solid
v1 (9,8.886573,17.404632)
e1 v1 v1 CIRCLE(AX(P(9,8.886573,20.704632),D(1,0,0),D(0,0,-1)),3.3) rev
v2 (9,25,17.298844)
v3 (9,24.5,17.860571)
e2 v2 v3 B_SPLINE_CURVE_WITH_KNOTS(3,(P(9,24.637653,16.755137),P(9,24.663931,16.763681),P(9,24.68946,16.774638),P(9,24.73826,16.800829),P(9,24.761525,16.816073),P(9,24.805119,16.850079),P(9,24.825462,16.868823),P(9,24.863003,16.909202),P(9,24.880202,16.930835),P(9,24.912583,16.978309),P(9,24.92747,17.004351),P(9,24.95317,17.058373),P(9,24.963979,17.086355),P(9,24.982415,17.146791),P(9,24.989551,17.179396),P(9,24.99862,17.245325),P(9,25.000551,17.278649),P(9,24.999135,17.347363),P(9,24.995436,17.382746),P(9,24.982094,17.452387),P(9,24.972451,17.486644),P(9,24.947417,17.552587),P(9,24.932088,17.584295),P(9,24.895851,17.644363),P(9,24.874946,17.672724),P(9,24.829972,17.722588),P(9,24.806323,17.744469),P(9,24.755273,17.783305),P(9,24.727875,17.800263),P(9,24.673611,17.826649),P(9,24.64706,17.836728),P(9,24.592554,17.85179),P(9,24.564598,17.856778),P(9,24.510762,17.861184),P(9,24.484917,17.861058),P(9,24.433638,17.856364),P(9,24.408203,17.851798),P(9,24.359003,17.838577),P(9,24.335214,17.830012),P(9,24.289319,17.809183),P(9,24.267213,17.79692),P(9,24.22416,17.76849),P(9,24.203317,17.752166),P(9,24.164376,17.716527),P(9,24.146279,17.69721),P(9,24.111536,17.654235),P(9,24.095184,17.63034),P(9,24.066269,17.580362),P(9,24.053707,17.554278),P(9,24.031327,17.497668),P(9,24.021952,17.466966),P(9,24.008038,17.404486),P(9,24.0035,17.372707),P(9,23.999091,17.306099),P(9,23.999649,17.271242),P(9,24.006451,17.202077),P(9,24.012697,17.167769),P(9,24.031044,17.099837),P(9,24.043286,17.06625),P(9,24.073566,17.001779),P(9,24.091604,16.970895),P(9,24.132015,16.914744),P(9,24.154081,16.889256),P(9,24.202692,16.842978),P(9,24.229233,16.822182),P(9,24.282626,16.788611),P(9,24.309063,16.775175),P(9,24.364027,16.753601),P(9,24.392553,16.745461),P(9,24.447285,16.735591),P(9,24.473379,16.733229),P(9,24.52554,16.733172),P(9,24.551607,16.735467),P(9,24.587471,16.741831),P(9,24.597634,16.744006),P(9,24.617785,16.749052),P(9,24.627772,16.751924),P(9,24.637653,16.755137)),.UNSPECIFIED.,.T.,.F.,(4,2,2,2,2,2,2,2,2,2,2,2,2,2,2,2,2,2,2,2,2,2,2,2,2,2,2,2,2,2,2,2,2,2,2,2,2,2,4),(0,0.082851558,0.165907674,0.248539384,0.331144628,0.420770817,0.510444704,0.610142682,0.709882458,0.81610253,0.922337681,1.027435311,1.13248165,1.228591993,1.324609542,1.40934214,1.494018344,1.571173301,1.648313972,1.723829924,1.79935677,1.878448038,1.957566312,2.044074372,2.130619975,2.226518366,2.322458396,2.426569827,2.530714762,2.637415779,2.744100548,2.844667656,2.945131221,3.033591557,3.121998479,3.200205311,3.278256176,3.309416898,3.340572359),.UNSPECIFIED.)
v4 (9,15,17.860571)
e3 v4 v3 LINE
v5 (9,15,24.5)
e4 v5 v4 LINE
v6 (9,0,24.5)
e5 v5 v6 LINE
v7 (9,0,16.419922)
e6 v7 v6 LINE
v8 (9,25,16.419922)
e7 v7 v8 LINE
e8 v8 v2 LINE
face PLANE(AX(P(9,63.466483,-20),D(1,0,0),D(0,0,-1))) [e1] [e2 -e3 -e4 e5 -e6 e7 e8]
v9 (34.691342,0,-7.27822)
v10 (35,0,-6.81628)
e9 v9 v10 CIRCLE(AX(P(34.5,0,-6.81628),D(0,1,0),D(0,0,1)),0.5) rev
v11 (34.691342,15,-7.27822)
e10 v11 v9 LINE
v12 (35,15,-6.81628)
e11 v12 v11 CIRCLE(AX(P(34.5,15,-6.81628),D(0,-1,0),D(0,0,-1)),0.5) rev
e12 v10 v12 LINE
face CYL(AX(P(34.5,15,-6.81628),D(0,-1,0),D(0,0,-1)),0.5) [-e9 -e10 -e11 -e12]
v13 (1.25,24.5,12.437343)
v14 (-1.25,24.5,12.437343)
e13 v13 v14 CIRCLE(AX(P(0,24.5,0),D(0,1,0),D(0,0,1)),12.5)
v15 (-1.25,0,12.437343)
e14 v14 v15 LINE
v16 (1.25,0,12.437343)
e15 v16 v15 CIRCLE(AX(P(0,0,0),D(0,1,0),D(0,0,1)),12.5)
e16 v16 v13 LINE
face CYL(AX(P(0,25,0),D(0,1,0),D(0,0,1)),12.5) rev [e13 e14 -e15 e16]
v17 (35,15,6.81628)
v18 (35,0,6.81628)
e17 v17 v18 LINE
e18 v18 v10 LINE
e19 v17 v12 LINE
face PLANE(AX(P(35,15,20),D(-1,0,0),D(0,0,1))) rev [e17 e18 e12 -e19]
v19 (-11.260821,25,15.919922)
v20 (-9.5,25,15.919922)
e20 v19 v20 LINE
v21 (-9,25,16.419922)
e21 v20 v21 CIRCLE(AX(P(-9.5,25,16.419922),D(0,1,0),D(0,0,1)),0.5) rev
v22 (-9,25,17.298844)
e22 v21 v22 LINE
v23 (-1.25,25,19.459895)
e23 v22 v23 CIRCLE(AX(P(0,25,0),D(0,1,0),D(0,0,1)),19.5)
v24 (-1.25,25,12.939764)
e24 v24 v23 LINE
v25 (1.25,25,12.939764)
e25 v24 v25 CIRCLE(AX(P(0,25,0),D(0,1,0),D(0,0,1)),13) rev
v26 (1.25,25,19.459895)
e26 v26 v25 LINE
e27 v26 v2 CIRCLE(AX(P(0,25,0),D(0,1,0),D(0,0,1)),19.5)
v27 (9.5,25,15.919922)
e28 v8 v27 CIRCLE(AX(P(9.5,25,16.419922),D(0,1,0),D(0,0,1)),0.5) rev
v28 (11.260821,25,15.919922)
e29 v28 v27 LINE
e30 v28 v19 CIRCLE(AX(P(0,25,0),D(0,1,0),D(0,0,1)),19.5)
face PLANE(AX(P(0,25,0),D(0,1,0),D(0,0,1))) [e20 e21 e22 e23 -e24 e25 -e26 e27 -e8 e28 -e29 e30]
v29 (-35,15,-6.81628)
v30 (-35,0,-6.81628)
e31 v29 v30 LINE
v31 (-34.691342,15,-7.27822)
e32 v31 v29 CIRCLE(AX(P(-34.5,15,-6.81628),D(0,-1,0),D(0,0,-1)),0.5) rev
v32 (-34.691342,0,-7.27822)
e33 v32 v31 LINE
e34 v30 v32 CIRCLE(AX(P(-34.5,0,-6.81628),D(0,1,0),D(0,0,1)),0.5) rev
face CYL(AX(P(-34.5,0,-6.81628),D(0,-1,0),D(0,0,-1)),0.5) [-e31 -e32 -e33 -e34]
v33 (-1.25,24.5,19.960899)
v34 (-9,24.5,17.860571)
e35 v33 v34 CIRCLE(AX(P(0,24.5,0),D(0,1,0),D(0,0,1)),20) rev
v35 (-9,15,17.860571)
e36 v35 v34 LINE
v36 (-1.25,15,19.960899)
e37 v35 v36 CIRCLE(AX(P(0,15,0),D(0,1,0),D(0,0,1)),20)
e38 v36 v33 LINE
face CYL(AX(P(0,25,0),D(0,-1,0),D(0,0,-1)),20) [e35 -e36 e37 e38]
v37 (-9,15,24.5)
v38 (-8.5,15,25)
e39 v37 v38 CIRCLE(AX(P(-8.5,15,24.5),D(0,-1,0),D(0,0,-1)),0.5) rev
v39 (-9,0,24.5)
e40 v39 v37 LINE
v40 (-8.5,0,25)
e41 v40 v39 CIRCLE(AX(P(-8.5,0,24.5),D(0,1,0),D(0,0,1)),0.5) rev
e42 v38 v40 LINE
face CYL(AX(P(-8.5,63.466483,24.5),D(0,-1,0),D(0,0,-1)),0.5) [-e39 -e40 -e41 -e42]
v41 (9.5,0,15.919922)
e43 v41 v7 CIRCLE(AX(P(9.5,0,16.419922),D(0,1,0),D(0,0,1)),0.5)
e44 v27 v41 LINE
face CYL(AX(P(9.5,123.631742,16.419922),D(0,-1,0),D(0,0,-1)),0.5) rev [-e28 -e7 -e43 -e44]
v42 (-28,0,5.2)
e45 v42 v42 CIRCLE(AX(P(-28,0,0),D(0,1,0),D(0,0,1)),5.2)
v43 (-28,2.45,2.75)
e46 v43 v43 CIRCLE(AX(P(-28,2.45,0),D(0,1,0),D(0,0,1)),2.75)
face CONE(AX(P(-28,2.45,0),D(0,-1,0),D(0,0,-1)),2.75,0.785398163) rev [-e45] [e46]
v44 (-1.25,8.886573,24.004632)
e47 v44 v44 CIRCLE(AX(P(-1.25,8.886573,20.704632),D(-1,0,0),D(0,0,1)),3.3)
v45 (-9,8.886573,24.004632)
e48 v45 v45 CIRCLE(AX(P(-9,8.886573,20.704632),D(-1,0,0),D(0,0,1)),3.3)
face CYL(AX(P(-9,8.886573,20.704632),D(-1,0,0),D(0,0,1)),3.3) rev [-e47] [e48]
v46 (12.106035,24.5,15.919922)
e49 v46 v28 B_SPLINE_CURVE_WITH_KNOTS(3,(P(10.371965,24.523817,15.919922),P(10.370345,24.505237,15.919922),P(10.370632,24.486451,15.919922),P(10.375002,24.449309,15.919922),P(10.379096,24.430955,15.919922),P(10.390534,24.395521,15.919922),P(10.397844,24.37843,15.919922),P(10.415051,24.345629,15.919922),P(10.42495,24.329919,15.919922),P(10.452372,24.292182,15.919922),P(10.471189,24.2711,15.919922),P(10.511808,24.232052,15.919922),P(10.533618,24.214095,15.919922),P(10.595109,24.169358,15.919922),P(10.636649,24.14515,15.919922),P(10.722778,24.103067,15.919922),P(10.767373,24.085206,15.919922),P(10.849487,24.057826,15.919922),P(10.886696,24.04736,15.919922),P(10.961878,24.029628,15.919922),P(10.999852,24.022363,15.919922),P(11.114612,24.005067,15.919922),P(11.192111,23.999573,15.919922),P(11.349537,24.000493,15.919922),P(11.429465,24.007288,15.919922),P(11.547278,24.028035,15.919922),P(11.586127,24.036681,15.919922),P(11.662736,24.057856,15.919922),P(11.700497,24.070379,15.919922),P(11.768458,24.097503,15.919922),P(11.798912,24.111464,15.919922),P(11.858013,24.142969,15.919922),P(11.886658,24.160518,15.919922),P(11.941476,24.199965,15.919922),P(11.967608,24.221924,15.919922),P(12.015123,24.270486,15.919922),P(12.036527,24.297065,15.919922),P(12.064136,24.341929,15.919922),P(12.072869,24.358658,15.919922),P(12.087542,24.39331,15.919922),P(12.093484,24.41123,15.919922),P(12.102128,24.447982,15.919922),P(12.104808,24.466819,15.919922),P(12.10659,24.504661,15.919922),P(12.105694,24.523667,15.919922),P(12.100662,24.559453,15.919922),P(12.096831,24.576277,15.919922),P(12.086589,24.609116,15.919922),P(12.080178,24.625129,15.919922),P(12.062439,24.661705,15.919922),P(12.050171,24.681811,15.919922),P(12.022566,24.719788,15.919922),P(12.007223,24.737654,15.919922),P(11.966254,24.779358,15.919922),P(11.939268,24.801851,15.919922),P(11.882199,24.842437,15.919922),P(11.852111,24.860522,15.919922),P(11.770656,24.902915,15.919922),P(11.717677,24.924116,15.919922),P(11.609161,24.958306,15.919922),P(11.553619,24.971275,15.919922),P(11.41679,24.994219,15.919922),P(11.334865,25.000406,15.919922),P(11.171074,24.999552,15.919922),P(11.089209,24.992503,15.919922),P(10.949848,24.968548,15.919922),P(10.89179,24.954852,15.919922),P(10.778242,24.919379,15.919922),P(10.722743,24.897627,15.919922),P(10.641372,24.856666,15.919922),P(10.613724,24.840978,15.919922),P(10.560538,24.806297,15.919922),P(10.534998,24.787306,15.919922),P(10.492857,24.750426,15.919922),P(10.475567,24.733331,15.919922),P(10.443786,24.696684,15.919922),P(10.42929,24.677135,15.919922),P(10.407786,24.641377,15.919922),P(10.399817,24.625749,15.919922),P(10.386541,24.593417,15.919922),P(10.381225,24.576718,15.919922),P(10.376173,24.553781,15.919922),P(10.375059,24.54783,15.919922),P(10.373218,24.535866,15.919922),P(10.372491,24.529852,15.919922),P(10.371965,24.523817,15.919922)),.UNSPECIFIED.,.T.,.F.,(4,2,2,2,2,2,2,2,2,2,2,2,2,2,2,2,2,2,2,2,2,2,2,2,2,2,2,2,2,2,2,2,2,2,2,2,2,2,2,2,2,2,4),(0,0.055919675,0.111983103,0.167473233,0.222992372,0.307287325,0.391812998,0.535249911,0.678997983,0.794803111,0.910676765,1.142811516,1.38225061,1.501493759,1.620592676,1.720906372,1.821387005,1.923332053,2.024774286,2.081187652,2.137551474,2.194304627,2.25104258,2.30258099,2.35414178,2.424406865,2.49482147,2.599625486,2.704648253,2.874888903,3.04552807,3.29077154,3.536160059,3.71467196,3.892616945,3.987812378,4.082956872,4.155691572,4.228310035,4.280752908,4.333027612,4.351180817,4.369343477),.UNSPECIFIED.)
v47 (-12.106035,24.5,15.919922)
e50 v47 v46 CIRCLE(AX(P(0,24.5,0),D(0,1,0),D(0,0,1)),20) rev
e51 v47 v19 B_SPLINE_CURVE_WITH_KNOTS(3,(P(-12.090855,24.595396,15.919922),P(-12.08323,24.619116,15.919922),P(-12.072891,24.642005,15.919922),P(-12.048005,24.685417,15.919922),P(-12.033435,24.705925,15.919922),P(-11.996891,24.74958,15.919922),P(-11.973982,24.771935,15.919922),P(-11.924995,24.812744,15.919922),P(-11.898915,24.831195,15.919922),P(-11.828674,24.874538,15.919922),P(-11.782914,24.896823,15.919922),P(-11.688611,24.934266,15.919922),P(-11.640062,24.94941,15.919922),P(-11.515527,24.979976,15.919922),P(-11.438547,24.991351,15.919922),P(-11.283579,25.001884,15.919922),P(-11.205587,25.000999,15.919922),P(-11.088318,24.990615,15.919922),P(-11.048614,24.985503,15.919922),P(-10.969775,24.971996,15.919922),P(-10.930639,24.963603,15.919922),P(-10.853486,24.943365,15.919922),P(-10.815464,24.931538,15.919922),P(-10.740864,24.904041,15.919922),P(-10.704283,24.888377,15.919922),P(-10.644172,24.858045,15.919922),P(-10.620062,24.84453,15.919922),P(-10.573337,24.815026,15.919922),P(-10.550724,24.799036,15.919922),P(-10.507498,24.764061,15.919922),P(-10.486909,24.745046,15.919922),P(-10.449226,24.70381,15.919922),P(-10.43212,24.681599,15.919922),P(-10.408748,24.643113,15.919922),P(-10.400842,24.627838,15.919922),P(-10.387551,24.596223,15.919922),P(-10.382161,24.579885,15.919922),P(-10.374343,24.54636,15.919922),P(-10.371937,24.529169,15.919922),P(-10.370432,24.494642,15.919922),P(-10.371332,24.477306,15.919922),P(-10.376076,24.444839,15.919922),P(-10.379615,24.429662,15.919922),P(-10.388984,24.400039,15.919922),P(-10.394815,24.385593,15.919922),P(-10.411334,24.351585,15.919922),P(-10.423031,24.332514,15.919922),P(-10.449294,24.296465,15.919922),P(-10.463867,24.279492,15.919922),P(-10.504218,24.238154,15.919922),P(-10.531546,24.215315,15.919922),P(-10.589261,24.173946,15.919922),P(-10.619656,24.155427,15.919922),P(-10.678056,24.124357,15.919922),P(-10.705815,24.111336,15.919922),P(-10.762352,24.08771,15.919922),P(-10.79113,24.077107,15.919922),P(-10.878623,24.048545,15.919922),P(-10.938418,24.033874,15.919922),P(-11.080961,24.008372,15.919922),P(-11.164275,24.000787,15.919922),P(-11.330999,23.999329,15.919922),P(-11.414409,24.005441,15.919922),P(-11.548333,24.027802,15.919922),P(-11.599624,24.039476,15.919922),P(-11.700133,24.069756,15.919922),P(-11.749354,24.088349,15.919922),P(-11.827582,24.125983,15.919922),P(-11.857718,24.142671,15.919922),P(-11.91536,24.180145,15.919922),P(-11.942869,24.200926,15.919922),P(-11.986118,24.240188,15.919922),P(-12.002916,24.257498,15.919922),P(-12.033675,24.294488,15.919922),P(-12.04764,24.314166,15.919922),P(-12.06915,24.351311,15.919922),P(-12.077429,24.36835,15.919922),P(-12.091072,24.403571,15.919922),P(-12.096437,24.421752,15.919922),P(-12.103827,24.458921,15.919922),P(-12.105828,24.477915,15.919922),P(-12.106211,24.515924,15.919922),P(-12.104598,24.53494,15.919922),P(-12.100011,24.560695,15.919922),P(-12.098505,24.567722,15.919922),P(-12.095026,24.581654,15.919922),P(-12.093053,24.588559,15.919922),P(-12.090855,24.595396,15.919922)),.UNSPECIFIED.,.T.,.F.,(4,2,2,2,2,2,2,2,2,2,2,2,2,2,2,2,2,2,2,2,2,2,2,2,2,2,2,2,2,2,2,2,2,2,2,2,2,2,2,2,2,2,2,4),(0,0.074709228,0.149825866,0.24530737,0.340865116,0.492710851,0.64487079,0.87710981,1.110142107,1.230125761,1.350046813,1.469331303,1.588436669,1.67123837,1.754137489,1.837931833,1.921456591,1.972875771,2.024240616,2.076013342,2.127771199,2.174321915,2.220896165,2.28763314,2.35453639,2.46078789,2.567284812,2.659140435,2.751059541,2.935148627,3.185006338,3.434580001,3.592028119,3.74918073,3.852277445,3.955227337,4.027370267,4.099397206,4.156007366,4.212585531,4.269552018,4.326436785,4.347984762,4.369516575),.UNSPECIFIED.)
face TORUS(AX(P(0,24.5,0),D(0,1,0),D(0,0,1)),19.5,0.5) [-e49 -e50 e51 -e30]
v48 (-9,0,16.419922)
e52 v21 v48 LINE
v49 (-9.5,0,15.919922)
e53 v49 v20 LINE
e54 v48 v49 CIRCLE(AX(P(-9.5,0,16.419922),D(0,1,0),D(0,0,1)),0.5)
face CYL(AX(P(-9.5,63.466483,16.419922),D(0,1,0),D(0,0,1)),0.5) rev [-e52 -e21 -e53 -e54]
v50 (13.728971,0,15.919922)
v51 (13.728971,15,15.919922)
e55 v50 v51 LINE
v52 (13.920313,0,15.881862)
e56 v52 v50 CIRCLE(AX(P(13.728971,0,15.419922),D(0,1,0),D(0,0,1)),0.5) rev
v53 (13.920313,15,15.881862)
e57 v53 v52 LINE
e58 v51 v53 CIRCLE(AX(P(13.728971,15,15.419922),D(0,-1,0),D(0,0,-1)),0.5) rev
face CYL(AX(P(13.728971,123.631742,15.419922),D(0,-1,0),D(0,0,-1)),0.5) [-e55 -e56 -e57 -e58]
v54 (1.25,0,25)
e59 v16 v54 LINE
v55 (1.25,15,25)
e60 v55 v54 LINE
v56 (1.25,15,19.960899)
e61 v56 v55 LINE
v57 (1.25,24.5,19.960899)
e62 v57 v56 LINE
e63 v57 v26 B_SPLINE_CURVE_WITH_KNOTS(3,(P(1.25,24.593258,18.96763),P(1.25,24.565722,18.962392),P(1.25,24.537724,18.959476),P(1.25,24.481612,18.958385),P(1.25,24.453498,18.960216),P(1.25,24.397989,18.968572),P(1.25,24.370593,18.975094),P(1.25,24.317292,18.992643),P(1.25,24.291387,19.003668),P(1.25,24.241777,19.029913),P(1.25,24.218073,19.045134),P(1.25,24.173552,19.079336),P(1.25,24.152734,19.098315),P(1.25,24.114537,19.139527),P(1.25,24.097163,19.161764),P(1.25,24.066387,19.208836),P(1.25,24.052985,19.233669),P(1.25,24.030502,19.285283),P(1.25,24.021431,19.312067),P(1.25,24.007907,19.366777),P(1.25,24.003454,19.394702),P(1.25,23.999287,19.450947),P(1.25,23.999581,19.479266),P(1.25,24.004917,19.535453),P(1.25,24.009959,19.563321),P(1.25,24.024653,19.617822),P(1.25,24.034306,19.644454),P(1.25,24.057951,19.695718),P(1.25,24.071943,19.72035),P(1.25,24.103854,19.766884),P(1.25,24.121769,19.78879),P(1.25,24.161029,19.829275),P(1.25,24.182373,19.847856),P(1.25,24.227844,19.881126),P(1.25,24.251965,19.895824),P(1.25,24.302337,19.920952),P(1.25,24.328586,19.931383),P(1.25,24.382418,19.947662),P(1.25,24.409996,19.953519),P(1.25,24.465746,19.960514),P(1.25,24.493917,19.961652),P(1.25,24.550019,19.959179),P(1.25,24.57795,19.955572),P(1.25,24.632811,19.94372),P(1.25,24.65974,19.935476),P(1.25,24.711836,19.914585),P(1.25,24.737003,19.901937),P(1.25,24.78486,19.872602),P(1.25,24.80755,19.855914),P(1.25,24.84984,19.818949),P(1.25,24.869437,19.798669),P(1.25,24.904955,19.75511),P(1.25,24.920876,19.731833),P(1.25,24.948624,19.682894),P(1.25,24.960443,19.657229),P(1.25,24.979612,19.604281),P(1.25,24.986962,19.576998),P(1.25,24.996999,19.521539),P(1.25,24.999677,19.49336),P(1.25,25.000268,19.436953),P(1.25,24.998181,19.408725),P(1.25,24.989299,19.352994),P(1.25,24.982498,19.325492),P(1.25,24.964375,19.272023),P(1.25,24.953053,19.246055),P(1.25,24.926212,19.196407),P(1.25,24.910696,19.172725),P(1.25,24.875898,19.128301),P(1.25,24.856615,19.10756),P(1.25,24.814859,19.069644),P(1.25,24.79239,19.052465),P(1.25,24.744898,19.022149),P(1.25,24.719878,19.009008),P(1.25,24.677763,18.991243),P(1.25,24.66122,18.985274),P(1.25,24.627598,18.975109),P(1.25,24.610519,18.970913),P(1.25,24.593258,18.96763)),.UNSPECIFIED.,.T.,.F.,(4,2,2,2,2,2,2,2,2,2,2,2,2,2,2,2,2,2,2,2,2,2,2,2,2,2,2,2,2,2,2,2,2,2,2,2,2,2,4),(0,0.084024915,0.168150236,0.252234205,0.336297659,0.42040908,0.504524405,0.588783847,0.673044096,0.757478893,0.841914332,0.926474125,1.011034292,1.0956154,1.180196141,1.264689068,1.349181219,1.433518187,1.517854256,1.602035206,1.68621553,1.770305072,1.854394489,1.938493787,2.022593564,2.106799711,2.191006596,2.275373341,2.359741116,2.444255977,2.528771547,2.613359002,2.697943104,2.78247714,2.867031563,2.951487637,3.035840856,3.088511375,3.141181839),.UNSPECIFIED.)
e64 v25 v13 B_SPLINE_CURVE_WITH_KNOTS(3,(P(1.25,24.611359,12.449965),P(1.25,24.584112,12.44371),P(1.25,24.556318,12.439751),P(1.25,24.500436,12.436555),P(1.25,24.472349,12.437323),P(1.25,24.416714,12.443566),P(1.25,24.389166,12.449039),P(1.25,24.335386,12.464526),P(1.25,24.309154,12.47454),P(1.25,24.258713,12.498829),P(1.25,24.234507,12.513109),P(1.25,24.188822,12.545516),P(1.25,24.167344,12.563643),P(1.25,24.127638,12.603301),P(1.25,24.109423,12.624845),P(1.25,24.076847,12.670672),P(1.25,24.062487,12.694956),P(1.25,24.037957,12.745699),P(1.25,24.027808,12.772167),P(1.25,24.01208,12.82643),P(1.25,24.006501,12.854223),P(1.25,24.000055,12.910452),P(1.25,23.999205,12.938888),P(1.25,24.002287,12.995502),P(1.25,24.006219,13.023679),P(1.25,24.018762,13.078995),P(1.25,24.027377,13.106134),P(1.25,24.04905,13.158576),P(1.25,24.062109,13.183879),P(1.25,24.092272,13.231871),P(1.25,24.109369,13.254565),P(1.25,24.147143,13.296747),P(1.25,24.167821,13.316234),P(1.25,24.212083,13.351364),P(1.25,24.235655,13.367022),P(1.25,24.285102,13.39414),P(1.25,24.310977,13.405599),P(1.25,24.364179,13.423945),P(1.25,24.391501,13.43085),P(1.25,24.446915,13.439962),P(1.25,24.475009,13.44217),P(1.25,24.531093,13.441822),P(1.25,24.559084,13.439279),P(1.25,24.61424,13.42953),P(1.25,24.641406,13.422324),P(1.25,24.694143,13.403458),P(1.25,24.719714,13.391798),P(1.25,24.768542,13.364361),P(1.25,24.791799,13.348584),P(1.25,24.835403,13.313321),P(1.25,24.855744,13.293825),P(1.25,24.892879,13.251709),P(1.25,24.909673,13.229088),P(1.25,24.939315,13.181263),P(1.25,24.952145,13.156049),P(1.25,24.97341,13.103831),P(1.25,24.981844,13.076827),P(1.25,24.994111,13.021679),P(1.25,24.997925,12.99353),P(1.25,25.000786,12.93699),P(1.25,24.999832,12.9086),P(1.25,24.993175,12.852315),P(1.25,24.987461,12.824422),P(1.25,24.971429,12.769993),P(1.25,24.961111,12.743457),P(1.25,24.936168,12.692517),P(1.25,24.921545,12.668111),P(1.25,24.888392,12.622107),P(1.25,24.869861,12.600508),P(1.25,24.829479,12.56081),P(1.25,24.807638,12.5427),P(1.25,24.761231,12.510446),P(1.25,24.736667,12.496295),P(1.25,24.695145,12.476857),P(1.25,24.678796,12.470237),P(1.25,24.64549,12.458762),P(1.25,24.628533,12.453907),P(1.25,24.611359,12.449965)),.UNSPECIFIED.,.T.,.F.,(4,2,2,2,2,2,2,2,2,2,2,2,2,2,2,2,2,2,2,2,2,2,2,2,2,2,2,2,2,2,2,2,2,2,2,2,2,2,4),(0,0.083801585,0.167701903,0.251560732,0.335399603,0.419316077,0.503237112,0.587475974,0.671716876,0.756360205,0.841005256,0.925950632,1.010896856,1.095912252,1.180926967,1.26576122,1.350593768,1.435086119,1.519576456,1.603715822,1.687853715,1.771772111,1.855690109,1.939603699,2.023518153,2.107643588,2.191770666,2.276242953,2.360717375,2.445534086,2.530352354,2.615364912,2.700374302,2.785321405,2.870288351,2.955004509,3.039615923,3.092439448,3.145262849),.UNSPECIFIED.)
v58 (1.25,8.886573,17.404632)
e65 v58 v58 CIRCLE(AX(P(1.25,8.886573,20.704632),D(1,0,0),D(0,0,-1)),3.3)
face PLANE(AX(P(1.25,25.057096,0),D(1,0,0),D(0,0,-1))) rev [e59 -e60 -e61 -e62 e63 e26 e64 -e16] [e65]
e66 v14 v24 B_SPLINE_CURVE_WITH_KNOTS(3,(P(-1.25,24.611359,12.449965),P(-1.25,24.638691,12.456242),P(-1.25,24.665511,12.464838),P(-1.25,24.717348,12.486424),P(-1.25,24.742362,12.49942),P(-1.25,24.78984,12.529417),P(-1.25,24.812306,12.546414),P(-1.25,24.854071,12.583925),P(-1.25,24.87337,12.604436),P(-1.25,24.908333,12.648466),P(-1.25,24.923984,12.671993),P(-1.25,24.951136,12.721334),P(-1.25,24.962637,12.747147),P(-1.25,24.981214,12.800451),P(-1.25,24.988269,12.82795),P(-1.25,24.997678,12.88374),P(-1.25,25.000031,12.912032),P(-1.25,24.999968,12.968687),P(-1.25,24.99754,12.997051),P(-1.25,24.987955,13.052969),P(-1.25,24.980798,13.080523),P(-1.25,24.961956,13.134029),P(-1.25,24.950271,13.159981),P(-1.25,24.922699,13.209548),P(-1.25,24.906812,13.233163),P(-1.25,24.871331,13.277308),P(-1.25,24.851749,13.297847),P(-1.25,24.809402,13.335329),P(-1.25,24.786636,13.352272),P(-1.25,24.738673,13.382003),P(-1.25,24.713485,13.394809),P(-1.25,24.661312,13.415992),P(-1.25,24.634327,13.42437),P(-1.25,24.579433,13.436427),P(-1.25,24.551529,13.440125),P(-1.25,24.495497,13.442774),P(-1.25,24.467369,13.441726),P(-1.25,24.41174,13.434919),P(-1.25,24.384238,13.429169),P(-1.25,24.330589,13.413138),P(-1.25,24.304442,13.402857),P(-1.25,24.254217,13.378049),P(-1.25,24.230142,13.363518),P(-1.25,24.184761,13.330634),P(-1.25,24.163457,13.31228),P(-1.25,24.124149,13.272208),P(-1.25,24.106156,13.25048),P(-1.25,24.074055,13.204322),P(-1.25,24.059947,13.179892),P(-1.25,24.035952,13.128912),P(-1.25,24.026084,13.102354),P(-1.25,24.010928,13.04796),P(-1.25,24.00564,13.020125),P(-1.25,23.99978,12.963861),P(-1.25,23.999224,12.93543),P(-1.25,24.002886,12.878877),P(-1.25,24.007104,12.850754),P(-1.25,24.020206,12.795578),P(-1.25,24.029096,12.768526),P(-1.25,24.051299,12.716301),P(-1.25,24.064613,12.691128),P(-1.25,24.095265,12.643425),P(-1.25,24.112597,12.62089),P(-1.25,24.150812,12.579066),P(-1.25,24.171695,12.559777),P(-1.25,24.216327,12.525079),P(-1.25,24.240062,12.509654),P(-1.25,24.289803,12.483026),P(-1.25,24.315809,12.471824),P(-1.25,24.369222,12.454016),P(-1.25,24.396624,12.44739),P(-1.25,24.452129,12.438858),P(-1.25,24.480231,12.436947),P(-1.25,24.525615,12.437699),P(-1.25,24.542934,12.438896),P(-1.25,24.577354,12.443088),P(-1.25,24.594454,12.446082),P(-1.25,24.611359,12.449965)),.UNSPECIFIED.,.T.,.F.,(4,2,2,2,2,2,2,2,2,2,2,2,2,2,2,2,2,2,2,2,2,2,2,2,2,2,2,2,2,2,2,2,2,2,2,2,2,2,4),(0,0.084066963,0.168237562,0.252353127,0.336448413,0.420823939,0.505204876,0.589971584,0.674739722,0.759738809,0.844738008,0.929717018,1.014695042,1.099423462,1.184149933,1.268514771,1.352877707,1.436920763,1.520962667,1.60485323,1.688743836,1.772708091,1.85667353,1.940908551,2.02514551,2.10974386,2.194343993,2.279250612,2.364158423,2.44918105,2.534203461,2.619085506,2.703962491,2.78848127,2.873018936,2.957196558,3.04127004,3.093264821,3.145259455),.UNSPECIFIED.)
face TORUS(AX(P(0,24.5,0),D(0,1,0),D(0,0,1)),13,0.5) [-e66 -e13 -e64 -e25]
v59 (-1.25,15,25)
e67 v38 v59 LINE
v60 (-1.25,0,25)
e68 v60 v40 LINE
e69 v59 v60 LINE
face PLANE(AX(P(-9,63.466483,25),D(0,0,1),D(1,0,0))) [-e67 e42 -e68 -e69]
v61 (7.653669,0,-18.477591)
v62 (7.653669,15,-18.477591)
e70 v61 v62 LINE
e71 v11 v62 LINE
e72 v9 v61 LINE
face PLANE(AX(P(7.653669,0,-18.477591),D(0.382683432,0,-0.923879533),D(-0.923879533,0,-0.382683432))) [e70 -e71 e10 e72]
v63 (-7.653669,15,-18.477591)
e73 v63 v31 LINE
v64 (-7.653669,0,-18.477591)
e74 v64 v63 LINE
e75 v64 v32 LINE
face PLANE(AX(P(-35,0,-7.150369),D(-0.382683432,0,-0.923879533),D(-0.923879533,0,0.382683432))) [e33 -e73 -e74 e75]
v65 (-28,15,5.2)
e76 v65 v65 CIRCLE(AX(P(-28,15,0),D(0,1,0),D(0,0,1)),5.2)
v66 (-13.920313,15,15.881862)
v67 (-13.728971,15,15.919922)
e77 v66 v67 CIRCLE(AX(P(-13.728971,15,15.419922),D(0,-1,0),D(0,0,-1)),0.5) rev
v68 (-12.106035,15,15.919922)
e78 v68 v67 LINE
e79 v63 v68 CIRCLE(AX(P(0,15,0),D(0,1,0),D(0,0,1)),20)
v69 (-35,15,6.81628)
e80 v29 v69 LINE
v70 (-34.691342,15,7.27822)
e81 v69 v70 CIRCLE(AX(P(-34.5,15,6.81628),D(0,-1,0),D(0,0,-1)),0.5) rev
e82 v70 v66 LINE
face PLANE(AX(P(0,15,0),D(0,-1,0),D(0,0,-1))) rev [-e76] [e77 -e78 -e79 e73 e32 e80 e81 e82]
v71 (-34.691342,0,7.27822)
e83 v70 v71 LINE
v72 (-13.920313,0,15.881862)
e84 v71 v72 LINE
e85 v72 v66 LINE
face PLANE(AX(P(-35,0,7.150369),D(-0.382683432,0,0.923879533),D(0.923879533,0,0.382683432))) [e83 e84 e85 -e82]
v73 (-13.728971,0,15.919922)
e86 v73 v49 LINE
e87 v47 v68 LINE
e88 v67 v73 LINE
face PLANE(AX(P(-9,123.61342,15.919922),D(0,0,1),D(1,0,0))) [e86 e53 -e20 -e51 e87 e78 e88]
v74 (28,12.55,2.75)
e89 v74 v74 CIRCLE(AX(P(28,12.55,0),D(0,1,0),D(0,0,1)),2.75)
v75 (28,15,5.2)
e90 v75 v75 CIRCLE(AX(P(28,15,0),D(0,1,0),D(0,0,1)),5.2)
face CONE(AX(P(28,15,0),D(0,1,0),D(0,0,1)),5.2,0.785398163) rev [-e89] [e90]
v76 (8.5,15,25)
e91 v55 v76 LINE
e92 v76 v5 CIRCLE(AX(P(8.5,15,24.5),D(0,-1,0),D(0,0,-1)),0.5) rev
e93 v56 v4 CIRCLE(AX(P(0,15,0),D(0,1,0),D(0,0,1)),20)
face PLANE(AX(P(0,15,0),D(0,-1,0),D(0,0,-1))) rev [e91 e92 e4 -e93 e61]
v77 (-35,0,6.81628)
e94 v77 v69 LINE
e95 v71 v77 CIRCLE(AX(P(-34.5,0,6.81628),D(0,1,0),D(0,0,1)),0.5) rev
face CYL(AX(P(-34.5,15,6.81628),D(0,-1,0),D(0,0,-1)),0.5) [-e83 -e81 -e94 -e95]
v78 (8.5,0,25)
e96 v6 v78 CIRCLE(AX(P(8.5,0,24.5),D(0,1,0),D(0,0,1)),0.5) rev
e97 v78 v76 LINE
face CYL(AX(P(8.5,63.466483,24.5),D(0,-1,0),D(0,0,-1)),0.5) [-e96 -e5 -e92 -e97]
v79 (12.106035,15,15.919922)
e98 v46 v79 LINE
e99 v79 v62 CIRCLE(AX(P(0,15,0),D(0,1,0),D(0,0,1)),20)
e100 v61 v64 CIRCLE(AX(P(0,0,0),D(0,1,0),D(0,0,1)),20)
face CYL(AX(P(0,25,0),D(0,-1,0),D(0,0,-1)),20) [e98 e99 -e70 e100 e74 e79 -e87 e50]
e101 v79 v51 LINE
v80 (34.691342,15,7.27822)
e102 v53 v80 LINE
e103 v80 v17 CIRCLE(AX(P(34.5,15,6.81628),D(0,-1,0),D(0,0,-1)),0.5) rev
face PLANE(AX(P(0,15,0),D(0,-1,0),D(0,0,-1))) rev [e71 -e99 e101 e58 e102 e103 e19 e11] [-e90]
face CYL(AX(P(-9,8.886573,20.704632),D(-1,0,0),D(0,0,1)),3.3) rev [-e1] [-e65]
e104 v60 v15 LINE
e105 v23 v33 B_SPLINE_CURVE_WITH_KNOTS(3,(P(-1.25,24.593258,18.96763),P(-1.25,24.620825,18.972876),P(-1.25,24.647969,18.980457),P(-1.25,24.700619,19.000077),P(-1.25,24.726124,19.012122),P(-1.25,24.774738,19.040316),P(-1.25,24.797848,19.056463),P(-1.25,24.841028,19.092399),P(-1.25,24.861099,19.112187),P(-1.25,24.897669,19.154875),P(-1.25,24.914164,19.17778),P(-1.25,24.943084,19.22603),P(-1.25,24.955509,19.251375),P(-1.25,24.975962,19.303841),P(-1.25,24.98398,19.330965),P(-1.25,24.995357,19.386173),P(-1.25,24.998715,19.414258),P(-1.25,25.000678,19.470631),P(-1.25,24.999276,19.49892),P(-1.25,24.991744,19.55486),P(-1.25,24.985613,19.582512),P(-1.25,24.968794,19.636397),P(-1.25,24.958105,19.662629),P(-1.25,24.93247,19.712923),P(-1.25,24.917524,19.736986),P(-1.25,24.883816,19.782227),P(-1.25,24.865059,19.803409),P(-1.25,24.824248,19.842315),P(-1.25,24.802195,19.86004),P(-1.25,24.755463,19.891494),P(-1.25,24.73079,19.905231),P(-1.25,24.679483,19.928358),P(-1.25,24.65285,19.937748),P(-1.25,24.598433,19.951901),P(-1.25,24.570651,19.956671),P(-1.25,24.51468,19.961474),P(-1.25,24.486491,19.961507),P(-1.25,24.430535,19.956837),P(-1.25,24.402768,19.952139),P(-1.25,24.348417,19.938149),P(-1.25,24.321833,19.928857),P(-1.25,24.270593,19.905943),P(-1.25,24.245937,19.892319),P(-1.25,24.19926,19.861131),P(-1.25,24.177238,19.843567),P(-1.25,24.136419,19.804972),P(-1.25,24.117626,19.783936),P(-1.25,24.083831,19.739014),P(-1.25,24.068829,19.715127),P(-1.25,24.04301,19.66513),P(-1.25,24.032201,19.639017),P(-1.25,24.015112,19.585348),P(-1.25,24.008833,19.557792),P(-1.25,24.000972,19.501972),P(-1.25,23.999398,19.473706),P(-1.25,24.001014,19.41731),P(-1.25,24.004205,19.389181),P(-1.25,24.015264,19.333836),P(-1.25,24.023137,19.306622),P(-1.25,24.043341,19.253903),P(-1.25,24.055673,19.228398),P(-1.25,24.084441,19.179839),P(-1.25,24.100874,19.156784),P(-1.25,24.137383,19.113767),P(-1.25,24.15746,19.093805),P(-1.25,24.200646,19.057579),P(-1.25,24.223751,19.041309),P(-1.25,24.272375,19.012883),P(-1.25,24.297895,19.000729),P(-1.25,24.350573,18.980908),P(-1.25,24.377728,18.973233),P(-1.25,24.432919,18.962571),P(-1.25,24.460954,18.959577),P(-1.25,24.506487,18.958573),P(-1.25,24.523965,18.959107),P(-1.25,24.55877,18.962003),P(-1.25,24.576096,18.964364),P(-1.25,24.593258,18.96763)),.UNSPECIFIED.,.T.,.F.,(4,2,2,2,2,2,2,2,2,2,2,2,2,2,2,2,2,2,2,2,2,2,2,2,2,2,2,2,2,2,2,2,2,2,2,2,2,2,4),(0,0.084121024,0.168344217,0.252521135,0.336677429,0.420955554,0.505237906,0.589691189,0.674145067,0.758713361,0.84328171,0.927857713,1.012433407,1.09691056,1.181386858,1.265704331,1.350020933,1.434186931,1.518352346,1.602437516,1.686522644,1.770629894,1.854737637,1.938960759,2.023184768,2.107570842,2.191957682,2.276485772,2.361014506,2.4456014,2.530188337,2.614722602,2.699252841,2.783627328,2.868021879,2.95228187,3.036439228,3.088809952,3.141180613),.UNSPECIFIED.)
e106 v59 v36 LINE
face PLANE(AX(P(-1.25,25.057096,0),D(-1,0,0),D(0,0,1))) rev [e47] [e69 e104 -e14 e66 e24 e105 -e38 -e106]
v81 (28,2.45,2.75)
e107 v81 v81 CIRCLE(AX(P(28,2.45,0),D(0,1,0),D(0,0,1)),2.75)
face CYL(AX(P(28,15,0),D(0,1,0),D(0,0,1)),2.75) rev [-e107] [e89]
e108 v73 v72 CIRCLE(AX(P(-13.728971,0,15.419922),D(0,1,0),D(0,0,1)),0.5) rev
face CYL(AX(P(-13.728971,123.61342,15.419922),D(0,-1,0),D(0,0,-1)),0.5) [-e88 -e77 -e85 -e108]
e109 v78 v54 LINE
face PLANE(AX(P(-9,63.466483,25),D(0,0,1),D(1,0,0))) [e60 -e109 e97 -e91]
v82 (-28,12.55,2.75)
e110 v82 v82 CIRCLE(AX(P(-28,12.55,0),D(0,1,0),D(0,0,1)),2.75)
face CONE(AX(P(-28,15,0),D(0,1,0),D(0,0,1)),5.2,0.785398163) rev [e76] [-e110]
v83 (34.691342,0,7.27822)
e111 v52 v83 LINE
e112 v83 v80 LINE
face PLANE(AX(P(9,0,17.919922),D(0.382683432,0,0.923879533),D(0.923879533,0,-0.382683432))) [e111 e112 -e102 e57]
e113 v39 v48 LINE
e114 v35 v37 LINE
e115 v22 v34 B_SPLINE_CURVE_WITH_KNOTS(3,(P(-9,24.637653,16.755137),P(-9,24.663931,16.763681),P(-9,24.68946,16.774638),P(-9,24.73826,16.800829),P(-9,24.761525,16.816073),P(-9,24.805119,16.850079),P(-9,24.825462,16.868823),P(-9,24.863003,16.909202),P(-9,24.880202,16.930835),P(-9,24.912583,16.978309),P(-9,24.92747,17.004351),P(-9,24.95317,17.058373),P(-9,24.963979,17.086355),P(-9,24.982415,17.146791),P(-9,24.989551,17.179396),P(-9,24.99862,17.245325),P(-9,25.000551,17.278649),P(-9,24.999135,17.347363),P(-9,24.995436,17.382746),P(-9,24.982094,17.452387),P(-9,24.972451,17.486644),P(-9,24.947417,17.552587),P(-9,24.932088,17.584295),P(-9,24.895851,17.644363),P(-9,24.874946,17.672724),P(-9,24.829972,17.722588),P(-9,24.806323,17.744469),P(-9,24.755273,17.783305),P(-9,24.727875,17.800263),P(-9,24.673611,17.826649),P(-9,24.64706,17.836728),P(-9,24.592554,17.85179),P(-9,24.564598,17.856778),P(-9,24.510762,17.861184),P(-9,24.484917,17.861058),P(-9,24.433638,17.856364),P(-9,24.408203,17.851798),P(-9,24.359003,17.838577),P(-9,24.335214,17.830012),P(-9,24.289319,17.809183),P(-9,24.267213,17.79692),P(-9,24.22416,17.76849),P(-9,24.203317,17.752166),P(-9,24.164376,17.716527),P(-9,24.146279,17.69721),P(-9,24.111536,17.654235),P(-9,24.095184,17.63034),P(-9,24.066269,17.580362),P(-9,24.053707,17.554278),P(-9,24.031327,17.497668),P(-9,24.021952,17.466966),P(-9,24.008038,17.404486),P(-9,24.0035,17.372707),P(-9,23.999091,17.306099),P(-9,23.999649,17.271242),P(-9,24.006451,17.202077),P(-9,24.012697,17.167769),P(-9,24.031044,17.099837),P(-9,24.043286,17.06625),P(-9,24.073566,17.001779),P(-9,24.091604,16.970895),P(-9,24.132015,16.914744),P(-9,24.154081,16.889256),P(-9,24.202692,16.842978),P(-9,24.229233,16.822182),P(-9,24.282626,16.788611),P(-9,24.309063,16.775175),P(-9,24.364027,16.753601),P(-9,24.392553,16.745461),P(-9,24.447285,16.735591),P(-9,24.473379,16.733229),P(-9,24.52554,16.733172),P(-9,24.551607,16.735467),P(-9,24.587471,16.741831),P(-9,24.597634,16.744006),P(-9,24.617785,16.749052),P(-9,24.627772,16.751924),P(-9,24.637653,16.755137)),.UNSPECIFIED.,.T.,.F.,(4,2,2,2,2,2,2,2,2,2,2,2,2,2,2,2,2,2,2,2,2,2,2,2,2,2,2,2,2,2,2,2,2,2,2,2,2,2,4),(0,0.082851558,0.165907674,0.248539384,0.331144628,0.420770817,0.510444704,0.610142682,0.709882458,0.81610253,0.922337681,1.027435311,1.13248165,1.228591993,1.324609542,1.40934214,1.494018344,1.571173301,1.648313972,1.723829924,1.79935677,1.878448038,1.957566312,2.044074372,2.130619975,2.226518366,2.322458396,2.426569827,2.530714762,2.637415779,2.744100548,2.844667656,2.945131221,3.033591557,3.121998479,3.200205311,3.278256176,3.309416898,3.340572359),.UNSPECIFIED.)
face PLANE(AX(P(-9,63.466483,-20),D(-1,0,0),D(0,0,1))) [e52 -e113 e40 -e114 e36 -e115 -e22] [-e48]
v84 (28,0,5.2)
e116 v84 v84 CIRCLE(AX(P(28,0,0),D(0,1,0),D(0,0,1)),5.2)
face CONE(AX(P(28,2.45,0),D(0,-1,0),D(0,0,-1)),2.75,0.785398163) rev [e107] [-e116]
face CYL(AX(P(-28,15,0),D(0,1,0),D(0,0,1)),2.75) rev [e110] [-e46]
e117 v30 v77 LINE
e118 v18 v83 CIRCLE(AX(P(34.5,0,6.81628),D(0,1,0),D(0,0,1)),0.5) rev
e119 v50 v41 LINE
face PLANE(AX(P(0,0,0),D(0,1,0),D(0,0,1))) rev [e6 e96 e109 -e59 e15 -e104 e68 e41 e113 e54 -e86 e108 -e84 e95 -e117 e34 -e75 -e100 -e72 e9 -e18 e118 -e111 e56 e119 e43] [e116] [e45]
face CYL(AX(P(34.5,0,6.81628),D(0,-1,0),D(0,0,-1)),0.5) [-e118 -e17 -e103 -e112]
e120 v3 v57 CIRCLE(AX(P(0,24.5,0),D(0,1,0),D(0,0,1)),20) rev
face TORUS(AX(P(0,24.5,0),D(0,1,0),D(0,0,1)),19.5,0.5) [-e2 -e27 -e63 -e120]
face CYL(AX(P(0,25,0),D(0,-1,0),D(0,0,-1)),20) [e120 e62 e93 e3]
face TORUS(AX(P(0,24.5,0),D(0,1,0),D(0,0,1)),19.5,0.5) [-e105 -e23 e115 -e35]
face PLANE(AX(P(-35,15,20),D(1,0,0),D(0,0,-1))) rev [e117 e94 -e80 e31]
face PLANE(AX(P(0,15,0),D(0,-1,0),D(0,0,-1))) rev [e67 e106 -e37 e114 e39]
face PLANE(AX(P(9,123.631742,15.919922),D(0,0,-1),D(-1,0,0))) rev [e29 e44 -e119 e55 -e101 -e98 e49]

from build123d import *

# Parameters (mm, degrees)
SKETCH1_W                                    = 70
SKETCH1_H                                    = 40
EXTRUDE1_DEPTH                               = 15
SKETCH3_R                                    = 20
EXTRUDE2_DEPTH                               = 10
SKETCH21_W                                   = 18
SKETCH21_H                                   = 45
EXTRUDE7_DEPTH                               = 15
F_25_0_MM_DOWEL_HOLES1_DEPTH                 = 15
F_25_0_MM_DOWEL_HOLES1_2_OUTLINE_R           = 12.5
F_25_0_MM_DOWEL_HOLES1_2_DEPTH               = 25
CSK_FOR_M5_COUNTERSUNK_FLAT_HEAD_SCR_2_COUNT = 2
CSK_FOR_M5_COUNTERSUNK_FLAT_HEAD_SCR_2_PITCH = 56
EXTRUDE8_START                               = -15
EXTRUDE8_DEPTH                               = 15
FILLET10_R                                   = 0.5
EXTRUDE9_DEPTH                               = 46.552167896
SKETCH23_W                                   = 2.5
SKETCH23_H                                   = 25
EXTRUDE10_DEPTH                              = 50.749371906
FILLET11_R                                   = 0.5
M6_CLEARANCE_HOLE1_D                         = 6.6


with BuildPart() as part:
    # Sketch1 → Extrude1 (new body)
    with BuildSketch(Plane(origin=(0, 0, 0), x_dir=(1, 0, 0), z_dir=(0, 1, 0))):
        Rectangle(SKETCH1_W, SKETCH1_H)
    extrude(amount=EXTRUDE1_DEPTH)

    # Sketch3 → Extrude2 (add)
    with BuildSketch(Plane(origin=(0, 15, 0), x_dir=(1, 0, 0), z_dir=(0, 1, 0))):
        with Locations(Location((0, 0, 0), (0, 0, 270))):
            Circle(SKETCH3_R)
    extrude(amount=EXTRUDE2_DEPTH)

    # 25.0 mm Dowel Holes1 2 outline → 25.0 mm Dowel Holes1 2 (cut)
    with BuildSketch(Plane(origin=(0, 0, 0), x_dir=(1, 0, 0), z_dir=(0, 1, 0))):
        Circle(F_25_0_MM_DOWEL_HOLES1_2_OUTLINE_R)
    extrude(amount=F_25_0_MM_DOWEL_HOLES1_2_DEPTH, mode=Mode.SUBTRACT)

    # Sketch11 → CSK for M5 Countersunk Flat Head Screw1 (revolve, cut)
    with BuildSketch(Plane(origin=(-28, 15, 0), x_dir=(0, 0, 1), z_dir=(1, 0, 0))):
        Polygon((0, 0), (0, 15), (5.2, 15), (2.75, 12.55), (2.75, 2.45), (5.2, 0), align=None)
    csk_for_m5_countersunk_flat_head_screw1 = revolve(axis=Axis((-28, 21.35, 0), (0, -1, 0)), mode=Mode.SUBTRACT)

    # CSK for M5 Countersunk Flat Head Scr 2: CSK for M5 Countersunk Flat Head Screw1 ×2
    with Locations(*[(i * CSK_FOR_M5_COUNTERSUNK_FLAT_HEAD_SCR_2_PITCH, 0, 0) for i in range(1, CSK_FOR_M5_COUNTERSUNK_FLAT_HEAD_SCR_2_COUNT)]):
        add(csk_for_m5_countersunk_flat_head_screw1, mode=Mode.SUBTRACT)


with BuildPart() as body_2:
    # Sketch21 → Extrude7 (new body)
    with BuildSketch(Plane.XZ):
        with Locations((0, 2.5)):
            Rectangle(SKETCH21_W, SKETCH21_H)
    extrude(amount=-EXTRUDE7_DEPTH)

    # Ø25.0 mm Dowel Holes1: read off the stored shape, not the designer's step
    # Ø25.0 mm Dowel Holes1 outline → Ø25.0 mm Dowel Holes1 (cut)
    with BuildSketch(Plane(origin=(0, 0, 0), x_dir=(1, 0, 0), z_dir=(0, 1, 0))):
        with BuildLine():
            Line((-9, 20), (-9, -8.674675786))
            ThreePointArc((-9, -8.674675786), (0, -12.5), (9, -8.674675786))
            Line((9, -8.674675786), (9, 20))
            Line((9, 20), (-9, 20))
        make_face()
    extrude(amount=F_25_0_MM_DOWEL_HOLES1_DEPTH, mode=Mode.SUBTRACT)


with BuildPart() as part_1:
    add(part.part)

    # Sculpt4: read off the stored shape, not the designer's step
    # Sculpt4: union body 2
    add(body_2.part)

    # Extrude8: read off the stored shape, not the designer's step
    # Extrude8 outline → Extrude8 (cut)
    with BuildSketch(Plane(origin=(0, 15, 0), x_dir=(1, 0, 0), z_dir=(0, 1, 0)).offset(EXTRUDE8_START)):
        Polygon((35, -20), (35, -7.150369323), (9, -17.919921944), (9, -20), align=None)
        with BuildLine():
            Line((-35, 20), (-35, 7.150369323))
            Line((-35, 7.150369323), (-7.653668647, 18.47759065))
            ThreePointArc((-7.653668647, 18.47759065), (-3.901806443, 19.615705608), (-6e-09, 20))
            Line((-6e-09, 20), (-35, 20))
        make_face()
        Polygon((-9, -20), (-9, -17.919921944), (-35, -7.150369323), (-35, -20), align=None)
        with BuildLine():
            Line((35, 20), (-6e-09, 20))
            ThreePointArc((-6e-09, 20), (3.901806437, 19.615705609), (7.653668647, 18.47759065))
            Line((7.653668647, 18.47759065), (35, 7.150369323))
            Line((35, 7.150369323), (35, 20))
        make_face()
    extrude(amount=EXTRUDE8_DEPTH, mode=Mode.SUBTRACT)

    # Fillet10
    fillet10_edges = [part_1.edges().sort_by_distance(p)[0] for p in [
        (0, 25, -20),
        (-12.5, 25, 0),
        (-35, 7.5, -7.150369323),
        (35, 7.5, -7.150369323),
        (35, 7.5, 7.150369323),
        (-35, 7.5, 7.150369323),
        (-9, 7.5, 25),
        (9, 7.5, 25),
    ]]
    fillet(fillet10_edges, radius=FILLET10_R)

    # Sketch22 → Extrude9 (cut, symmetric)
    with BuildSketch(Plane(origin=(0, 15, 0), x_dir=(1, 0, 0), z_dir=(0, 1, 0))):
        Polygon((-9, -149.154505921), (-9, -17.919921944), (-9, -15.919921944), (-13.828427125, -15.919921944), (-145.063011101, -15.919921944), (-328.697324176, -203.452594264), (-192.634313075, -336.68717824), align=None)
    extrude9 = extrude(amount=EXTRUDE9_DEPTH, both=True, mode=Mode.SUBTRACT)

    # Mirror3: Extrude9 across plane
    add(extrude9.mirror(Plane(origin=(0, 0, 0), x_dir=(0, 0, 1), z_dir=(1, 0, 0))), mode=Mode.SUBTRACT)

    # Sketch23 → Extrude10 (cut, through all)
    with BuildSketch(Plane.XZ):
        with Locations((0, 12.5)):
            Rectangle(SKETCH23_W, SKETCH23_H)
    extrude(amount=-EXTRUDE10_DEPTH, mode=Mode.SUBTRACT)

    # Fillet11
    fillet11_edges = [part_1.edges().sort_by_distance(p)[0] for p in [
        (-9, 12.5, 15.919921944),
        (-13.828427124, 7.5, 15.919921944),
        (13.828427124, 7.5, 15.919921944),
        (9, 12.5, 15.919921944),
    ]]
    fillet(fillet11_edges, radius=FILLET11_R)

    # M6 Clearance Hole1 (through all)
    with Locations(Plane.ZY.offset(9)):
        with Locations((20.704631923, 8.886572753)):
            Hole(M6_CLEARANCE_HOLE1_D / 2)


solid = part_1.part
